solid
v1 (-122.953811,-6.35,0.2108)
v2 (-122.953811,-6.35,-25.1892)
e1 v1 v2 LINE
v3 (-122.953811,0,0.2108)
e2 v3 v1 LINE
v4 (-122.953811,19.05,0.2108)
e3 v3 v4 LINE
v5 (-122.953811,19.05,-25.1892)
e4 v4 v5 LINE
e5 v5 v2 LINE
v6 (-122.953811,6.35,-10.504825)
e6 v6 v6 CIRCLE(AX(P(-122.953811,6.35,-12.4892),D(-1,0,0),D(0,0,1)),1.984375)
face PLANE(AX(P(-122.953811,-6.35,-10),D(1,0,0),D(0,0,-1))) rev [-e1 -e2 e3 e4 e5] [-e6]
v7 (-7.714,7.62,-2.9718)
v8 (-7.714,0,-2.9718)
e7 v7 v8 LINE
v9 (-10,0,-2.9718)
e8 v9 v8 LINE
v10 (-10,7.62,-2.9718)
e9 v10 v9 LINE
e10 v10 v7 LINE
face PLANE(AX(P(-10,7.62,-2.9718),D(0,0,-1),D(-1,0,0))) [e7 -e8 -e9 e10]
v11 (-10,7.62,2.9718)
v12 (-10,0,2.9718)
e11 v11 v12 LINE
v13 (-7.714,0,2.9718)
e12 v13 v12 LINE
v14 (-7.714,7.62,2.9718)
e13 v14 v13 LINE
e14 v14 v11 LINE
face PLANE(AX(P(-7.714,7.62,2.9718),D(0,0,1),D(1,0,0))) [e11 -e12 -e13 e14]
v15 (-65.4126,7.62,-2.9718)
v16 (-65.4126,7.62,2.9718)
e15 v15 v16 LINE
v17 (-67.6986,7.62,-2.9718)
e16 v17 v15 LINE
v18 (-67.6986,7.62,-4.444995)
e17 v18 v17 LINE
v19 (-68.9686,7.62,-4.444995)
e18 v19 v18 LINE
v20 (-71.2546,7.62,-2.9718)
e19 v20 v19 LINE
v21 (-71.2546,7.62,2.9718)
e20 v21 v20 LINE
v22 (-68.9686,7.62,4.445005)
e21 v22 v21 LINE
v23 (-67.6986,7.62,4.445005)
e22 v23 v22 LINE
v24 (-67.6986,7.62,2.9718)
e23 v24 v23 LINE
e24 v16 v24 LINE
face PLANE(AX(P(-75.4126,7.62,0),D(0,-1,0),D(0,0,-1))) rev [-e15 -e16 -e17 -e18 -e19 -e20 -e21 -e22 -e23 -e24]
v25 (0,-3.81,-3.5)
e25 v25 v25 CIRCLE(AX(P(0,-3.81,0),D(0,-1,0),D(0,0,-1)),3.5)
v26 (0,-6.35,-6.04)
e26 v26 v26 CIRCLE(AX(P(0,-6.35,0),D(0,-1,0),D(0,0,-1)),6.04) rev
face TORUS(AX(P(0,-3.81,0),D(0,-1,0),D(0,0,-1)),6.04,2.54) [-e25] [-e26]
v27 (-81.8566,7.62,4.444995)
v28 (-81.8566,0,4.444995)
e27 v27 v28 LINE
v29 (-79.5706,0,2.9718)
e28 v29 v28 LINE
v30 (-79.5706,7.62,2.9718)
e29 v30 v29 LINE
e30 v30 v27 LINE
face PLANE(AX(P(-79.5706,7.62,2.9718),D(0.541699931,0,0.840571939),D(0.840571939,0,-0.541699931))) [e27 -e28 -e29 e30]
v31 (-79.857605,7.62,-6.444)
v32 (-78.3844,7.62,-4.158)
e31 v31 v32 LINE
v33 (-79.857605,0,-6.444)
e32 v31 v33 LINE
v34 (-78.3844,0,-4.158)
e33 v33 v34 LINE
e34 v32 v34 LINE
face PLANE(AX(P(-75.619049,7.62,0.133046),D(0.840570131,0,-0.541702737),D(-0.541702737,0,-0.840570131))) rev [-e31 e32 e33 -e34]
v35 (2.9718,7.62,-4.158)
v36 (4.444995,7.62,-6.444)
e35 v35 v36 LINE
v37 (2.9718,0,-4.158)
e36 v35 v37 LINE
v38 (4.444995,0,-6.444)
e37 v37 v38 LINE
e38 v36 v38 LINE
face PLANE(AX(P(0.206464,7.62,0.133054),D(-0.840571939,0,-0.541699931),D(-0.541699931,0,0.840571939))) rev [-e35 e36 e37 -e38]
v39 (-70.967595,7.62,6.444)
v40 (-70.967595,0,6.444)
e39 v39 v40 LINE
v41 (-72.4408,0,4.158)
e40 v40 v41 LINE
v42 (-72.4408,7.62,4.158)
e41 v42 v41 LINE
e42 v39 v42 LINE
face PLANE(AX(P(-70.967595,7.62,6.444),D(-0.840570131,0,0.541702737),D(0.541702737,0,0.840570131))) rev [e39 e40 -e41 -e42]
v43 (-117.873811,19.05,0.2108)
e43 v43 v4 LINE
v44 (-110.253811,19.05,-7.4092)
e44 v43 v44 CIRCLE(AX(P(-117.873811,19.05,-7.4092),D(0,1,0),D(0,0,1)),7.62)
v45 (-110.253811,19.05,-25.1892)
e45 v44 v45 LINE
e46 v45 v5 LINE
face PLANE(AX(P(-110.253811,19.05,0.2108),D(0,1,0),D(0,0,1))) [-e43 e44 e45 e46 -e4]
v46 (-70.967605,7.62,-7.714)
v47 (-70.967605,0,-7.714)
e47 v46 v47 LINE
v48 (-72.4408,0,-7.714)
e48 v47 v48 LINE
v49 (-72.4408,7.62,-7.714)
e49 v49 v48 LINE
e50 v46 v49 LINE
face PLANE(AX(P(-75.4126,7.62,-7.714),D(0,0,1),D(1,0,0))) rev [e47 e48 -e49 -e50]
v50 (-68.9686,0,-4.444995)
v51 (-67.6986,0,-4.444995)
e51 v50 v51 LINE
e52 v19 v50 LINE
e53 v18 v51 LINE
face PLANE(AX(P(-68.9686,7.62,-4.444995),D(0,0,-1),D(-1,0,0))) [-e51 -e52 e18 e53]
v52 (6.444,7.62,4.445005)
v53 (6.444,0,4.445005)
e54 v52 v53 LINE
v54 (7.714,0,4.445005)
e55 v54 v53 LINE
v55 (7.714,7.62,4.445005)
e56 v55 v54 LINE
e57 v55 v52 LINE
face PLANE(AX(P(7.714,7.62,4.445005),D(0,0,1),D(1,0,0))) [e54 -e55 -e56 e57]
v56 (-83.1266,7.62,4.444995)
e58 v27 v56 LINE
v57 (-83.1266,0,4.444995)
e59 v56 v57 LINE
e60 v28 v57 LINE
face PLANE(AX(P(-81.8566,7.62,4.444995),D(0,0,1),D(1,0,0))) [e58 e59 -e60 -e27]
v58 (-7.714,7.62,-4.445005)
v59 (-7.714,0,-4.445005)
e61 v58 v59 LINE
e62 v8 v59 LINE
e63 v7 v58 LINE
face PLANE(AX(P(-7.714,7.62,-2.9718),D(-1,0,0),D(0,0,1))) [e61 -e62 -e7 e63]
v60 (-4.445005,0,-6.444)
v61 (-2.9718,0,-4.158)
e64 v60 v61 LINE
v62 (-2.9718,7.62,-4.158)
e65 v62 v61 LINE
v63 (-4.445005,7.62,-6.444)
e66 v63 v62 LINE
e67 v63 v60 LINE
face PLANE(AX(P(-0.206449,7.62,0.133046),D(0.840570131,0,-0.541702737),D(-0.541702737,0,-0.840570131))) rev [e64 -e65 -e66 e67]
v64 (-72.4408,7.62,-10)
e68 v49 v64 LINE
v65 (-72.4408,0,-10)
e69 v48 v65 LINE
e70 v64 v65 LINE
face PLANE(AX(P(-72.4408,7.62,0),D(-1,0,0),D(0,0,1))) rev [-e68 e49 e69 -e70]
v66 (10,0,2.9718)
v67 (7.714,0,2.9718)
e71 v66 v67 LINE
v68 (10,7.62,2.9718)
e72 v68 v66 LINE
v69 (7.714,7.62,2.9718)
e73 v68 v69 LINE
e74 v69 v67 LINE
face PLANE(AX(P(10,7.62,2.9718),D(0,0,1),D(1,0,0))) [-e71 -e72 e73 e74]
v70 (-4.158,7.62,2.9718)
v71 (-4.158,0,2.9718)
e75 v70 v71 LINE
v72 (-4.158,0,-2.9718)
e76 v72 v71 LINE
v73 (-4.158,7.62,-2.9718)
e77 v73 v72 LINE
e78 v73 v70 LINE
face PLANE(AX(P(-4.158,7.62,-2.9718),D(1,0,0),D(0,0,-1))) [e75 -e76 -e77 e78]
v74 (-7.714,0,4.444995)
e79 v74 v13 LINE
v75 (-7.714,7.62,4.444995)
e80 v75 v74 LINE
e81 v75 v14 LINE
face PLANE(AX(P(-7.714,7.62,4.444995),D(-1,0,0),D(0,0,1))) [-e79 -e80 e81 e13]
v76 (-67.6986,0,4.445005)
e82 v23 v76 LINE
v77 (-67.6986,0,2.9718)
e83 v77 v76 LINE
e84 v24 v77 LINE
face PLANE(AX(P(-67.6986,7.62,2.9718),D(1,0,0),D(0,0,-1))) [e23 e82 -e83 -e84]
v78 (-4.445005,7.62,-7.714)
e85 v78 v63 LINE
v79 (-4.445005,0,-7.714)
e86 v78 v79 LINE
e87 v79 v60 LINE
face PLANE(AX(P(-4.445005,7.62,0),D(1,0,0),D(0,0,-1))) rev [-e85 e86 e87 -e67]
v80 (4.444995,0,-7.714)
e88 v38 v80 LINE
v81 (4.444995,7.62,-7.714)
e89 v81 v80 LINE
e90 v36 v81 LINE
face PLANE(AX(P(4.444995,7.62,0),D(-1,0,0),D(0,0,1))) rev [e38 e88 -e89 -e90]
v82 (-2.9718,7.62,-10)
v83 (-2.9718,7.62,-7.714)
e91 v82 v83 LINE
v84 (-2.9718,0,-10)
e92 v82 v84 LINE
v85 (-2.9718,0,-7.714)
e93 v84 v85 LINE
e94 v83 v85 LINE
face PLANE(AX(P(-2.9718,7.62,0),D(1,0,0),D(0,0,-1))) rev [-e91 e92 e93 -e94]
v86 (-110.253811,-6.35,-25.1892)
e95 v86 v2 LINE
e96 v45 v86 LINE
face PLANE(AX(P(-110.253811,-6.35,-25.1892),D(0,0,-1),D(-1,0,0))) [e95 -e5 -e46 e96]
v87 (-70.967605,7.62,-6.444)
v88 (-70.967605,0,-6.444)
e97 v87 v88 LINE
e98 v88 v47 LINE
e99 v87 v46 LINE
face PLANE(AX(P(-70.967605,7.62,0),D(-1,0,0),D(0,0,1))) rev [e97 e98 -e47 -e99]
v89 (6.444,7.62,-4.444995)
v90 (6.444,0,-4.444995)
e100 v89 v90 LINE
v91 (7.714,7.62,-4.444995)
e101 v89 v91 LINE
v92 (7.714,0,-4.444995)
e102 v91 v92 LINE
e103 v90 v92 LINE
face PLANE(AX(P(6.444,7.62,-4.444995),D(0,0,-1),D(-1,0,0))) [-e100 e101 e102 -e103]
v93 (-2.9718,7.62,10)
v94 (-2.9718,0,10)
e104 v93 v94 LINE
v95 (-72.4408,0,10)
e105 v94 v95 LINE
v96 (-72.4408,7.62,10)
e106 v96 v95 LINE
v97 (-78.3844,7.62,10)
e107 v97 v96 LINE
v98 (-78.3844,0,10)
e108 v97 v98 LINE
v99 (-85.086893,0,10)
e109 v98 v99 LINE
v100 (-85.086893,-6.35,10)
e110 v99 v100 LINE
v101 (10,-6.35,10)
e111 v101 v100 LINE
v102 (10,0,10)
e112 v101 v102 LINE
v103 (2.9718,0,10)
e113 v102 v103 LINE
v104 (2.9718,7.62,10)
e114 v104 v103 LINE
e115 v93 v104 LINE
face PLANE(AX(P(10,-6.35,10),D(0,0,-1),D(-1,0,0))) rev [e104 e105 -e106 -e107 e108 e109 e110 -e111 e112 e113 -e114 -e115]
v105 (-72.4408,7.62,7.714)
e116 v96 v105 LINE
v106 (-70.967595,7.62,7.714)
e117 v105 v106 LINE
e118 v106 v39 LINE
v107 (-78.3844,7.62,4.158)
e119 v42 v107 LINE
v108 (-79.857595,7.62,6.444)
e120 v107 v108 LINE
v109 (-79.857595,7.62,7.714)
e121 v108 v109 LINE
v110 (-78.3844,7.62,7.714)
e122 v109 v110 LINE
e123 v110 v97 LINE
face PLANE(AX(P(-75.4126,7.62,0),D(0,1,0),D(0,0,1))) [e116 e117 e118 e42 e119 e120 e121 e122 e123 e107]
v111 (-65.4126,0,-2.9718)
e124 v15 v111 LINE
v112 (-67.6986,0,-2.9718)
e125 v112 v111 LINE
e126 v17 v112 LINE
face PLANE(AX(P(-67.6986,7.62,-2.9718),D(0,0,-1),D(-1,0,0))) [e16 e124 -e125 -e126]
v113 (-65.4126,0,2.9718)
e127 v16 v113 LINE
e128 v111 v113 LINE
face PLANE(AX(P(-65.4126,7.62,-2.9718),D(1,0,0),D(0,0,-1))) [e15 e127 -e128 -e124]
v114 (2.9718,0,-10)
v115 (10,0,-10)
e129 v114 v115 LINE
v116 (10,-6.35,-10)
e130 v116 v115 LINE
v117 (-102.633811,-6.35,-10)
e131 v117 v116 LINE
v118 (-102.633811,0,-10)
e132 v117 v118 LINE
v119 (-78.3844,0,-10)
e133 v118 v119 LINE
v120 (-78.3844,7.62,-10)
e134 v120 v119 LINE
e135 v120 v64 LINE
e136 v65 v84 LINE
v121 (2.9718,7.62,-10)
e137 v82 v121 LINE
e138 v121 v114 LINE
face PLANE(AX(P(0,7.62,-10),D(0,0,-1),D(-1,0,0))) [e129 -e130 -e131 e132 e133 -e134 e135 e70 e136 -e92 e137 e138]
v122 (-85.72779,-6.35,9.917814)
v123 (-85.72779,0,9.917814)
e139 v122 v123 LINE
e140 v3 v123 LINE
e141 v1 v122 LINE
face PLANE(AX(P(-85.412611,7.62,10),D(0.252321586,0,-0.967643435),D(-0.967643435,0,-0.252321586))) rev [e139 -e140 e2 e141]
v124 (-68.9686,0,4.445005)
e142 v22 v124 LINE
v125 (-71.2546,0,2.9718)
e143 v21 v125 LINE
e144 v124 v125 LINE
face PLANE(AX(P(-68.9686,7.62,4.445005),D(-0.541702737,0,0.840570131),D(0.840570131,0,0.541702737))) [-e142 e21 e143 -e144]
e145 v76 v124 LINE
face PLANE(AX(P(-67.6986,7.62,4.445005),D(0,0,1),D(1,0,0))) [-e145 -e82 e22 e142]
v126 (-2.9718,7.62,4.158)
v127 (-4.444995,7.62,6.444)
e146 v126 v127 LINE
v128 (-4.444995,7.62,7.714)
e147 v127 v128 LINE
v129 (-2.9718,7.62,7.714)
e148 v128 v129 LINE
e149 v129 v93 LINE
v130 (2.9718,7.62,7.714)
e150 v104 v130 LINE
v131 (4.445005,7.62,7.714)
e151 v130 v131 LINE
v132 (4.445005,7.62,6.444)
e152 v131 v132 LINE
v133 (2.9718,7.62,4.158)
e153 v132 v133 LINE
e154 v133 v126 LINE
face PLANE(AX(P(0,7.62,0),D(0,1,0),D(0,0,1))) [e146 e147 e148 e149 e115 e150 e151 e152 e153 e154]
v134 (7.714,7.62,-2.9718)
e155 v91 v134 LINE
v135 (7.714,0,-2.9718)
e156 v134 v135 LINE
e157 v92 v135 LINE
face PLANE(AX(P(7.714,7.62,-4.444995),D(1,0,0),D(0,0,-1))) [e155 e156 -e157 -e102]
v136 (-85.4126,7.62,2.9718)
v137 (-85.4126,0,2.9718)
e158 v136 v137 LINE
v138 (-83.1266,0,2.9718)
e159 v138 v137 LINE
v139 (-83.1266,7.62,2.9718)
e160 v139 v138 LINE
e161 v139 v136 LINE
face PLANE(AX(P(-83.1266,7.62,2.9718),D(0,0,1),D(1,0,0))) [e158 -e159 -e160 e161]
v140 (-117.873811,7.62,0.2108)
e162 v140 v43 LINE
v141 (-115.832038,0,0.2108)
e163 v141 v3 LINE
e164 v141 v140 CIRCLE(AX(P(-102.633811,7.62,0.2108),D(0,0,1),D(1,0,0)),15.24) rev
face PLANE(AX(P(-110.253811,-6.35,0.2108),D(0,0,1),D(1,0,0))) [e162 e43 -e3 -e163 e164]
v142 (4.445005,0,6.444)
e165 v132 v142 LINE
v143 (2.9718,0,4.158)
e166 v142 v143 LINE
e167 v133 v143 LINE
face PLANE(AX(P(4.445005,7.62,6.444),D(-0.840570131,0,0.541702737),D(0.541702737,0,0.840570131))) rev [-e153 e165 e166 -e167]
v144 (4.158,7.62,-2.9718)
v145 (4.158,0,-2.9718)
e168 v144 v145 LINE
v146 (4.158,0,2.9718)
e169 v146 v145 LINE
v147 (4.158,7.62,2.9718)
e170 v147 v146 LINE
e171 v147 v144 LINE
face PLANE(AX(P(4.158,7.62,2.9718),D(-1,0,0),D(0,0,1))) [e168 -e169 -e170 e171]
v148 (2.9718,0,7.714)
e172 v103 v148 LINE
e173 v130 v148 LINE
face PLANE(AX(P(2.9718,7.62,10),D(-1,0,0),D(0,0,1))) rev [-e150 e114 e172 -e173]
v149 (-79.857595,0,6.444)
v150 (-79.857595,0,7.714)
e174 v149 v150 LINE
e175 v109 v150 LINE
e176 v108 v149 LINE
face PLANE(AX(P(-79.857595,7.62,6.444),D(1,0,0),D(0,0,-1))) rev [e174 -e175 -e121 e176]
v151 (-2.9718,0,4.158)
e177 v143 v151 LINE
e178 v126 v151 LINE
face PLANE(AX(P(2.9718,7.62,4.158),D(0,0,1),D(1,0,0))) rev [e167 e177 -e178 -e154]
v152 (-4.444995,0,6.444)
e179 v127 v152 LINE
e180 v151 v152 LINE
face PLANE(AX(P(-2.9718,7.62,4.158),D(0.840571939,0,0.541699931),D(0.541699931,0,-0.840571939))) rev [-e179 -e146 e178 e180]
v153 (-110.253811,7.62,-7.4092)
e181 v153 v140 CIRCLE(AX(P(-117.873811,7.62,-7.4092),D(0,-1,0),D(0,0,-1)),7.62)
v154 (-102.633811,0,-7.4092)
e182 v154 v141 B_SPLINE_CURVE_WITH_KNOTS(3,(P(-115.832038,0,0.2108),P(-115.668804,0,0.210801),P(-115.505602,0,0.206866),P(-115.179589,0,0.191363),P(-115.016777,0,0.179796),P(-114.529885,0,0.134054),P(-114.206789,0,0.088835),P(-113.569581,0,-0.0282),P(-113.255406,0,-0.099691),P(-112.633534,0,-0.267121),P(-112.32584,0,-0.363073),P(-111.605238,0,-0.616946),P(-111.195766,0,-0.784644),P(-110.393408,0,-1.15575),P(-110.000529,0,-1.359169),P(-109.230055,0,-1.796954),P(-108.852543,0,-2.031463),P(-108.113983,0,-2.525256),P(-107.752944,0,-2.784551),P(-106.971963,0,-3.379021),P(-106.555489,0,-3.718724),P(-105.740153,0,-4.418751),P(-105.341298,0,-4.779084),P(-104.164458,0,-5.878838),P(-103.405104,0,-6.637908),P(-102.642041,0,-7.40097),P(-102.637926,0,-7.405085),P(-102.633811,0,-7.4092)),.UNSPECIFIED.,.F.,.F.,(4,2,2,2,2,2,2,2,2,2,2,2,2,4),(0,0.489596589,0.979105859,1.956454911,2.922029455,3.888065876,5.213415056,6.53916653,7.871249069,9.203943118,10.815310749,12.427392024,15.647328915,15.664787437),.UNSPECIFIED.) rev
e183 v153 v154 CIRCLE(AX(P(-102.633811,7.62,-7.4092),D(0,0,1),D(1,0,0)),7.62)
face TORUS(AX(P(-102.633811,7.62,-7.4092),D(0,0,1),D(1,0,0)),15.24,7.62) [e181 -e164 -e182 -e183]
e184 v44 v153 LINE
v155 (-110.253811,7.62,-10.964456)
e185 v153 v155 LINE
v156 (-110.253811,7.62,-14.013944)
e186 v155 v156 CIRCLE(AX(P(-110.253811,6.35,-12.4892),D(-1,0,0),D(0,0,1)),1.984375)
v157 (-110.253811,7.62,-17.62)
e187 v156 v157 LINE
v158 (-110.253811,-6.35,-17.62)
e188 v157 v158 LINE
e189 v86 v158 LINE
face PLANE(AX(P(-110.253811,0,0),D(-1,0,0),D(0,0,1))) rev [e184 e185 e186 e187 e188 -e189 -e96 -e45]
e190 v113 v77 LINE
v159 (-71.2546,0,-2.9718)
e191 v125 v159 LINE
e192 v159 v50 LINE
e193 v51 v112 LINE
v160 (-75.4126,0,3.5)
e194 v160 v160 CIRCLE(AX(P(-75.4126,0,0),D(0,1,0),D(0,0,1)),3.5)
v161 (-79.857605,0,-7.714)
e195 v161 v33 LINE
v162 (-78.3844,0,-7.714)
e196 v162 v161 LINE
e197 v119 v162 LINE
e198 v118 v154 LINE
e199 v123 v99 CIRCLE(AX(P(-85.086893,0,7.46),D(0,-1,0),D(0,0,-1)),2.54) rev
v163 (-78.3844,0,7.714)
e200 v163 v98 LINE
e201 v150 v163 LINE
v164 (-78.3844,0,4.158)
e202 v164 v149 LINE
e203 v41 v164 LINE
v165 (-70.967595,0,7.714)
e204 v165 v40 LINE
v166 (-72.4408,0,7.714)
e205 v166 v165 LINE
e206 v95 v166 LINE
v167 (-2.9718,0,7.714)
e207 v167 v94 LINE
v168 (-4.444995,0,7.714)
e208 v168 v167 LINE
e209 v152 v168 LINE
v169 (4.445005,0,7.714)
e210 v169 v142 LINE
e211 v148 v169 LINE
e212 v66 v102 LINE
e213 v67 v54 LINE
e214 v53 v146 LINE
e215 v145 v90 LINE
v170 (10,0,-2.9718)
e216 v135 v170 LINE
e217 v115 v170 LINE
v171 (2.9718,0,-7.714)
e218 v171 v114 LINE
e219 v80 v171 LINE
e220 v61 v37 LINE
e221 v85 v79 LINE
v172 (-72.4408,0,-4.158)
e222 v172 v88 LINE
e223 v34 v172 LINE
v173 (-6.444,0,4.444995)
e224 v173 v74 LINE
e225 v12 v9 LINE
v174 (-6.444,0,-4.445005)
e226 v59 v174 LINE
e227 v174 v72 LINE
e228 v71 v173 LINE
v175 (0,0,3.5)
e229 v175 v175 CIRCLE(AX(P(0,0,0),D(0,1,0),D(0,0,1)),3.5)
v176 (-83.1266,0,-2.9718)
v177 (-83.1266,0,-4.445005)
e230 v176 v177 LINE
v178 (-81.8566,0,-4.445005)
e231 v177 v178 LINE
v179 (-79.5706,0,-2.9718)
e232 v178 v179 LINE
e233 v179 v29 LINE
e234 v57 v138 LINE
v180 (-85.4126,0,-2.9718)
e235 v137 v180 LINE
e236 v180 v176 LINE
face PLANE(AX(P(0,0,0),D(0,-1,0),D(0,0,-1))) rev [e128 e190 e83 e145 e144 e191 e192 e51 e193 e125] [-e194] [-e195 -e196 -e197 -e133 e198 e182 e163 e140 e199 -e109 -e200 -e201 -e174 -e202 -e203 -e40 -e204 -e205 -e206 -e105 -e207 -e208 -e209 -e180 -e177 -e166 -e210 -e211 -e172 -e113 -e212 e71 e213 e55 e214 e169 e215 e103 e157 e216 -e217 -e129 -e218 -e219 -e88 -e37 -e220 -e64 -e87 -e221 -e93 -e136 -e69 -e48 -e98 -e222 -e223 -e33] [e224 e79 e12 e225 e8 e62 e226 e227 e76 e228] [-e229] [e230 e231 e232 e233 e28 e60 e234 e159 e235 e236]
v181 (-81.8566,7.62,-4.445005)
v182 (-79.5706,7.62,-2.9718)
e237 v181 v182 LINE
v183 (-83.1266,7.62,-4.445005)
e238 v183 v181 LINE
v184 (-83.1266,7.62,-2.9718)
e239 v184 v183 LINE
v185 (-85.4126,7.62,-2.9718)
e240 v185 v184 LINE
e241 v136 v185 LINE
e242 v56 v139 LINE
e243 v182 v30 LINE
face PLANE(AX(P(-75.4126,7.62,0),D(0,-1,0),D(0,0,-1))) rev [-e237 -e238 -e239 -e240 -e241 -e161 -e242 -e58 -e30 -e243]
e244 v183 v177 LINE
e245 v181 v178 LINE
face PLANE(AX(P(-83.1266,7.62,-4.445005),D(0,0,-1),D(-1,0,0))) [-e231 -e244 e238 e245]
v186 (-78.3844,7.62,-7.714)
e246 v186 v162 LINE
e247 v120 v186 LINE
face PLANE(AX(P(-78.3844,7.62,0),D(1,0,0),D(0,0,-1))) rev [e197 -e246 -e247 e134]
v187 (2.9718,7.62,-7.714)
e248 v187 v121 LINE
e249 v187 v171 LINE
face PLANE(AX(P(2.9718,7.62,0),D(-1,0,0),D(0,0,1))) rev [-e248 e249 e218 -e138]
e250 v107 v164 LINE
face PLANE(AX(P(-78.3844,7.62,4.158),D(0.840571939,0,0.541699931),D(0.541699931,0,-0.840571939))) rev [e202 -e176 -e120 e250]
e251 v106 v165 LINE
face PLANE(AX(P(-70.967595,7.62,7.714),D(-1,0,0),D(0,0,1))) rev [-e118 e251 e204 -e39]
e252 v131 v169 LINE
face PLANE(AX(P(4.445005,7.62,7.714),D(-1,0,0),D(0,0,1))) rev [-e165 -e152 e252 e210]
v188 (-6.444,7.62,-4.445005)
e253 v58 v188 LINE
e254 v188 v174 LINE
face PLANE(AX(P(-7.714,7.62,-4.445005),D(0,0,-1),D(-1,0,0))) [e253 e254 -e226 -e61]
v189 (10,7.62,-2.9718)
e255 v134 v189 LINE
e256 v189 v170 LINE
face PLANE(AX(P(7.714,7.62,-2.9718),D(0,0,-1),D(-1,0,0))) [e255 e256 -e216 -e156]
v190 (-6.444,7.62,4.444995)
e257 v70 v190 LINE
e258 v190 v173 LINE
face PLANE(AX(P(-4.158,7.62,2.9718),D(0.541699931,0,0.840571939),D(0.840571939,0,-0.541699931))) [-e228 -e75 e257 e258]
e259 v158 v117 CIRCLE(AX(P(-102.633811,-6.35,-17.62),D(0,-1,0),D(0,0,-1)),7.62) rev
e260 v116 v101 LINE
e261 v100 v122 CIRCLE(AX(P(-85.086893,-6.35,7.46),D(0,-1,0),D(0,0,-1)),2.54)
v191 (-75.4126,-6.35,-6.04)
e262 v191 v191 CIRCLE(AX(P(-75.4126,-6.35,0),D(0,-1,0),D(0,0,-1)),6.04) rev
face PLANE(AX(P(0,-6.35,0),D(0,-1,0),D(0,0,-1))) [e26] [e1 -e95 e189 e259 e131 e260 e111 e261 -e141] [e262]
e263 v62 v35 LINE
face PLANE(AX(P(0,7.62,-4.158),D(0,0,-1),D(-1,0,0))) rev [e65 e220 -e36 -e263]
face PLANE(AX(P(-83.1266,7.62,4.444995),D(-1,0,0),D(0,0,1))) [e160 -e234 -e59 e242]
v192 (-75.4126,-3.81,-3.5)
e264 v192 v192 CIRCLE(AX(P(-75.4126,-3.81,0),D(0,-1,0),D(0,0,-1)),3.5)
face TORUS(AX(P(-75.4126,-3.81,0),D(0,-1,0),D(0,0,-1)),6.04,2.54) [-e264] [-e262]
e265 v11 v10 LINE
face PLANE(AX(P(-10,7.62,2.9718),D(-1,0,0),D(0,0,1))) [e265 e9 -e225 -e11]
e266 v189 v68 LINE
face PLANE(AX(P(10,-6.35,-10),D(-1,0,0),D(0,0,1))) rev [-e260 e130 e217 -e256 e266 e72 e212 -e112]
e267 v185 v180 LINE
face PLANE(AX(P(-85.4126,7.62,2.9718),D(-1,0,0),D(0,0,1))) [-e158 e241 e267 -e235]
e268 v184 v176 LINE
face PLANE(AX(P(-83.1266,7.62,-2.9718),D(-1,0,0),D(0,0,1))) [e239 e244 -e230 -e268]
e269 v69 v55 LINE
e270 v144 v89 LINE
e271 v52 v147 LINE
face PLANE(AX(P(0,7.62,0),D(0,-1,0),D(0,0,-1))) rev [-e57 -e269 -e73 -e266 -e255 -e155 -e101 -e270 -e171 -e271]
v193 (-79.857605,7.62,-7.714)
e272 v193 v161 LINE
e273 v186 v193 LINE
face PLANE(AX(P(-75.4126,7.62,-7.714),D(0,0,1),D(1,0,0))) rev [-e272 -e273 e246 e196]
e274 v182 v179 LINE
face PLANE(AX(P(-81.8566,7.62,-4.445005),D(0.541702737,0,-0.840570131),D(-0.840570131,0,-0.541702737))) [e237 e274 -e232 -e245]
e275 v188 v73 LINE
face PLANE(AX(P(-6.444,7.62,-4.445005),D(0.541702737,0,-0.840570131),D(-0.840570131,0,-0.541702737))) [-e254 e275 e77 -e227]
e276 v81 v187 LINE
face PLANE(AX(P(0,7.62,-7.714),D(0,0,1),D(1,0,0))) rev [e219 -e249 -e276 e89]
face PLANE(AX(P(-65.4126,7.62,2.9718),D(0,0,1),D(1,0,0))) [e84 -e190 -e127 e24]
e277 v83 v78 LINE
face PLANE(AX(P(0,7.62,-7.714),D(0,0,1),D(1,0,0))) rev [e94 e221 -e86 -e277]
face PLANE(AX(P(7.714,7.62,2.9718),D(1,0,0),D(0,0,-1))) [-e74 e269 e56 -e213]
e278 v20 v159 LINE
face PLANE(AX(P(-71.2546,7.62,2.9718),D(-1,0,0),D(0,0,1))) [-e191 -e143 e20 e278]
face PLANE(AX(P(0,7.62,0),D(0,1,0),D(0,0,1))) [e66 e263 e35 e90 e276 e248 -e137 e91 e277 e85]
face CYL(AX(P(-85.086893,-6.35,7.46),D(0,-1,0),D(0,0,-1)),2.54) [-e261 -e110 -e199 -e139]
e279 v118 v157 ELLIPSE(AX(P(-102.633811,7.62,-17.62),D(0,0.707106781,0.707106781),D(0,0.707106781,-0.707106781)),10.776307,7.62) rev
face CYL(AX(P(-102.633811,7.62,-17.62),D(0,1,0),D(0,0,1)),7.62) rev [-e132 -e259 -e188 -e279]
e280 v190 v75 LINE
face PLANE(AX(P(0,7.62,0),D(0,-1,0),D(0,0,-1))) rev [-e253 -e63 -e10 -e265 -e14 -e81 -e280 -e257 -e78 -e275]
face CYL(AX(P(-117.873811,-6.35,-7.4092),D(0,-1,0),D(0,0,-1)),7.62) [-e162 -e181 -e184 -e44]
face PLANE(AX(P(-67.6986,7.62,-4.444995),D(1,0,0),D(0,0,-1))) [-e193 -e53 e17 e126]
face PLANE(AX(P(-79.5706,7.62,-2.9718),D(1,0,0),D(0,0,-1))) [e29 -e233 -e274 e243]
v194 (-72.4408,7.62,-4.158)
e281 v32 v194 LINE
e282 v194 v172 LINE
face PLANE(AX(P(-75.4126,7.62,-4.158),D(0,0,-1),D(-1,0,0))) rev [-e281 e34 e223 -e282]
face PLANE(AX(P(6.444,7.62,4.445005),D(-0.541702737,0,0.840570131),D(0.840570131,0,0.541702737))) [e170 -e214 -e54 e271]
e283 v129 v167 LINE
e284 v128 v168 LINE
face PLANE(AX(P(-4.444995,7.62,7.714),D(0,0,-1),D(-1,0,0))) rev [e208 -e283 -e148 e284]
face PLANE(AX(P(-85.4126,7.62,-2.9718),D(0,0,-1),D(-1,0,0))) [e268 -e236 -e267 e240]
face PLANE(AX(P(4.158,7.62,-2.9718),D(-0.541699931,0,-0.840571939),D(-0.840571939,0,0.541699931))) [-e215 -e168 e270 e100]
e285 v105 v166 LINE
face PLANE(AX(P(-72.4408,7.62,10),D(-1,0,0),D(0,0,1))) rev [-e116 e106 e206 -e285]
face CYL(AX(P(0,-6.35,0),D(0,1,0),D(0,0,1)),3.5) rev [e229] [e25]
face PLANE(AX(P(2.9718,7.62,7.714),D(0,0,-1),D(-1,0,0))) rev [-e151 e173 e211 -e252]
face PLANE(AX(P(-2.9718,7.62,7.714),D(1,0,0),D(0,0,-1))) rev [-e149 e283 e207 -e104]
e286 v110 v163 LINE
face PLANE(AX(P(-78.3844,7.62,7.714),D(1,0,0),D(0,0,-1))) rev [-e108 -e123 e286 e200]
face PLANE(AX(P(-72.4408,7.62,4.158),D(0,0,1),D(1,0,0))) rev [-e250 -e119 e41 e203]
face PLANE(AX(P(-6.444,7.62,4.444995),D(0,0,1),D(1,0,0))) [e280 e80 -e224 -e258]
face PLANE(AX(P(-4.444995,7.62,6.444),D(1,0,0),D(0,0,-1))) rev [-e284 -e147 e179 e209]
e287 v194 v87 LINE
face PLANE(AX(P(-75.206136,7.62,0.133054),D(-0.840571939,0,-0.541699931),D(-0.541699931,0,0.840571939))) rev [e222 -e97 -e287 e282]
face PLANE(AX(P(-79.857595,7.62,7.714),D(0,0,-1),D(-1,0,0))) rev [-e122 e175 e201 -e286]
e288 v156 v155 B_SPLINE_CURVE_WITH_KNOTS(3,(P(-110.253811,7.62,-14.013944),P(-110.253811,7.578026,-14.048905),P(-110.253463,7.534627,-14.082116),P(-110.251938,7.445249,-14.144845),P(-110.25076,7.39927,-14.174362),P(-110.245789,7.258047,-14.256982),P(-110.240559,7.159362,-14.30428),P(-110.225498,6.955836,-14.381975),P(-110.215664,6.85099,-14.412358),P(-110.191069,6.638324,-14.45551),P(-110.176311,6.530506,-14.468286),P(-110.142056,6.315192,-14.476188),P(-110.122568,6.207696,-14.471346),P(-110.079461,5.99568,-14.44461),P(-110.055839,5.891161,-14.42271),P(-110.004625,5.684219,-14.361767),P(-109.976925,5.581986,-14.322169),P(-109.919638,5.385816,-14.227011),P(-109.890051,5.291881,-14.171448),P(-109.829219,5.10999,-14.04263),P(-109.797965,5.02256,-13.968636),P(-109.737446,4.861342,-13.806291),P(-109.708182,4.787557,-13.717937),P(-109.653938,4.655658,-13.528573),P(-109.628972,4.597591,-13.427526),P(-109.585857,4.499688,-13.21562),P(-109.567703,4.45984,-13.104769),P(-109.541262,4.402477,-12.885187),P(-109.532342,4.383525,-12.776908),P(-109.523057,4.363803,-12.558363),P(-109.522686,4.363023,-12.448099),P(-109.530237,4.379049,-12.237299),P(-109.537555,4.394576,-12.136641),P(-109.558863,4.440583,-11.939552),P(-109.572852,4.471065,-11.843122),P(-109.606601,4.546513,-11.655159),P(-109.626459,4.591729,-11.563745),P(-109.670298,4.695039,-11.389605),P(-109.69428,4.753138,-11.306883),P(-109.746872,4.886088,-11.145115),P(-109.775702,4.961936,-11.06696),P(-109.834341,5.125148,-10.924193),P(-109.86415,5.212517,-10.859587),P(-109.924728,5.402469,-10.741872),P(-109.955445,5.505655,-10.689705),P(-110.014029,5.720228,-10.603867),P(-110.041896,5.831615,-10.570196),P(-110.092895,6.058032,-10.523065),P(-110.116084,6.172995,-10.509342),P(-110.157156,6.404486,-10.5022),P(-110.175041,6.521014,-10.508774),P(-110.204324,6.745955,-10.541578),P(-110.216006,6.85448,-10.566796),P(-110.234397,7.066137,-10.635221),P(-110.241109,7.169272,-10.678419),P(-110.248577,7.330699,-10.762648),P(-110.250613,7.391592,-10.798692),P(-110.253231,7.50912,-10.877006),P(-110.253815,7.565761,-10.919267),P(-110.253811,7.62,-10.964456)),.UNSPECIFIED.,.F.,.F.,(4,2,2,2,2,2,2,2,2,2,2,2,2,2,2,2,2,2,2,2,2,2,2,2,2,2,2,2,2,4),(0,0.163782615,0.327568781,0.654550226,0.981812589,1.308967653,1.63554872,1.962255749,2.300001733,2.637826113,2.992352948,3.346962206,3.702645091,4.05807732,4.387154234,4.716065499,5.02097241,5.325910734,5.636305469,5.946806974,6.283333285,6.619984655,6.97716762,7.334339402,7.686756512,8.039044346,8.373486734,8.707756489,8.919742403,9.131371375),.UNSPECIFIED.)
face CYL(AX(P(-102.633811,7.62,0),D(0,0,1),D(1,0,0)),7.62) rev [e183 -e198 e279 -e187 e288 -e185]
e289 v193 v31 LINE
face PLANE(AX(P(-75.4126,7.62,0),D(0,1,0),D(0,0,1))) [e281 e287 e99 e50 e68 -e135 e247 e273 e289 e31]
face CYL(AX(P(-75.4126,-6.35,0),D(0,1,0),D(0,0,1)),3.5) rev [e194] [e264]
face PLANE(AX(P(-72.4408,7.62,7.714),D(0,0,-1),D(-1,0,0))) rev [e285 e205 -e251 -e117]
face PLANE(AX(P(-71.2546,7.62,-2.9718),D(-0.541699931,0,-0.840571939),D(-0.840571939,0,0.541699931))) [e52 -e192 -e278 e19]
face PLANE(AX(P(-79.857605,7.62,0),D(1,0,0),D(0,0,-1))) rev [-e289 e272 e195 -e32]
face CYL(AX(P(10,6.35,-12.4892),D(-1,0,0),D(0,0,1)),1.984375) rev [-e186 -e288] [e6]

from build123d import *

# Parameters (mm, degrees)
BOSS_EXTRUDE1_DEPTH   = 7.62
BOSS_EXTRUDE1_2_DEPTH = 7.62
BOSS_EXTRUDE1_3_DEPTH = 7.62
BOSS_EXTRUDE1_4_DEPTH = 7.62
SKETCH2_W             = 132.9538108
SKETCH2_H             = 20
BOSS_EXTRUDE2_DEPTH   = 6.35
LPATTERN2_COUNT       = 2
LPATTERN2_PITCH       = 75.4126
CUT_EXTRUDE1_DEPTH    = 125.148300392
FILLET1_R             = 2.54
SKETCH6_W             = 25.4
SKETCH6_H             = 25.4
BOSS_EXTRUDE7_DEPTH   = 12.7
FILLET3_R             = 7.62
FILLET5_R             = 7.62
SKETCH11_R            = 1.984375
CUT_EXTRUDE3_DEPTH    = 137.653262418
SKETCH13_R            = 3.5
CUT_EXTRUDE5_DEPTH    = 127.945019246
FILLET6_R             = 2.54


with BuildPart() as part:
    # Sketch1 → Boss-Extrude1 (new body)
    with BuildSketch(Plane(origin=(0, 0, 0), x_dir=(1, 0, 0), z_dir=(0, 1, 0))):
        Polygon((-2.9718, 10), (-2.9718, 7.714), (-4.4450054, 7.714), (-4.4450054, 6.444), (-2.9718, 4.158), (2.9718, 4.158), (4.4449946, 6.444), (4.4449946, 7.714), (2.9718, 7.714), (2.9718, 10), align=None)
    boss_extrude1 = extrude(amount=BOSS_EXTRUDE1_DEPTH)



with BuildPart() as body_2:
    # Sketch1 → Boss-Extrude1 2 (new body)
    with BuildSketch(Plane(origin=(0, 0, 0), x_dir=(1, 0, 0), z_dir=(0, 1, 0))):
        Polygon((4.158, -2.9718), (4.158, 2.9718), (6.444, 4.4449946), (7.714, 4.4449946), (7.714, 2.9718), (10, 2.9718), (10, -2.9718), (7.714, -2.9718), (7.714, -4.4450054), (6.444, -4.4450054), align=None)
    boss_extrude1_2 = extrude(amount=BOSS_EXTRUDE1_2_DEPTH)


with BuildPart() as body_3:
    # Sketch1 → Boss-Extrude1 3 (new body)
    with BuildSketch(Plane(origin=(0, 0, 0), x_dir=(1, 0, 0), z_dir=(0, 1, 0))):
        Polygon((4.4450054, -6.444), (2.9718, -4.158), (-2.9718, -4.158), (-4.4449946, -6.444), (-4.4449946, -7.714), (-2.9718, -7.714), (-2.9718, -10), (2.9718, -10), (2.9718, -7.714), (4.4450054, -7.714), align=None)
    boss_extrude1_3 = extrude(amount=BOSS_EXTRUDE1_3_DEPTH)


with BuildPart() as body_4:
    # Sketch1 → Boss-Extrude1 4 (new body)
    with BuildSketch(Plane(origin=(0, 0, 0), x_dir=(1, 0, 0), z_dir=(0, 1, 0))):
        Polygon((-10, -2.9718), (-10, 2.9718), (-7.714, 2.9718), (-7.714, 4.4450054), (-6.444, 4.4450054), (-4.158, 2.9718), (-4.158, -2.9718), (-6.444, -4.4449946), (-7.714, -4.4449946), (-7.714, -2.9718), align=None)
    boss_extrude1_4 = extrude(amount=BOSS_EXTRUDE1_4_DEPTH)


with BuildPart() as part_1:
    add(part.part)

    add(body_2.part)  # Boss-Extrude2 merges body 2

    add(body_3.part)  # Boss-Extrude2 merges body 3

    add(body_4.part)  # Boss-Extrude2 merges body 4
    # Sketch2 → Boss-Extrude2 (add)
    with BuildSketch(Plane.XZ):
        with Locations((-56.4769054, 0)):
            Rectangle(SKETCH2_W, SKETCH2_H)
    extrude(amount=BOSS_EXTRUDE2_DEPTH)

    # LPattern2: Boss-Extrude1, Boss-Extrude1 2, Boss-Extrude1 3, Boss-Extrude1 4 ×2
    with Locations(*[(-i * LPATTERN2_PITCH, 0, 0) for i in range(1, LPATTERN2_COUNT)]):
        add(boss_extrude1)
        add(boss_extrude1_2)
        add(boss_extrude1_3)
        add(boss_extrude1_4)

    # Sketch4 → Cut-Extrude1 (cut, through all)
    with BuildSketch(Plane(origin=(0, -6.35, 0), x_dir=(-1, 0, 0), z_dir=(0, -1, 0))):
        Polygon((122.9538108, -10), (85.4126108, -10), (122.9538108, -0.2108), align=None)
    extrude(amount=-CUT_EXTRUDE1_DEPTH, mode=Mode.SUBTRACT)

    # Fillet1
    fillet1_edges = [part_1.edges().sort_by_distance(p)[0] for p in [
        (-85.4126108, -3.175, 10),
    ]]
    fillet(fillet1_edges, radius=FILLET1_R)

    # Sketch6 → Boss-Extrude7 (add)
    with BuildSketch(Plane.ZY.offset(122.9538108)):
        with Locations((-12.4892, 6.35)):
            Rectangle(SKETCH6_W, SKETCH6_H)
    extrude(amount=-BOSS_EXTRUDE7_DEPTH)

    # Fillet3
    fillet3_edges = [part_1.edges().sort_by_distance(p)[0] for p in [
        (-110.2538108, 0, -4.8946),
        (-110.2538108, -3.175, -10),
    ]]
    fillet(fillet3_edges, radius=FILLET3_R)

    # Fillet5
    # the kernel refuses this fillet: 7.62 mm, written as the material it takes off along each edge
    with BuildSketch(Plane(origin=(-110.2538108, 38.1, 0.2108), x_dir=(-1, 0, 0), z_dir=(0, -1, 0))) as fillet5_piece_1:
        with BuildLine():
            CenterArc((FILLET5_R, FILLET5_R), FILLET5_R, 180, 90)
            Line((0, FILLET5_R), (0, 0))
            Line((0, 0), (FILLET5_R, 0))
        make_face()
    extrude(amount=30.48, mode=Mode.SUBTRACT)
    with BuildSketch(Plane(origin=(-102.6338108, 7.62, 0.2108), x_dir=(0.5976672776328267, 0.8017442392976488, 0), z_dir=(-0.8017442392976488, 0.5976672776328267, 0))) as fillet5_piece_2_section:
        with BuildLine():
            CenterArc((7.62 + FILLET5_R, FILLET5_R), FILLET5_R, 180, 90)
            Line((7.62, FILLET5_R), (7.62, 0))
            Line((7.62, 0), (7.62 + FILLET5_R, 0))
        make_face()
    fillet5_piece_2 = revolve(axis=Axis((-102.6338108, 7.62, 0.2108), (0, 0, -1)), revolution_arc=233.296989237, mode=Mode.PRIVATE)
    fillet5_piece_2 = split(fillet5_piece_2, bisect_by=Plane(origin=(-108.348345601, 0, -2.163807766), z_dir=(0, 1, 0)), keep=Keep.TOP, mode=Mode.PRIVATE)
    add(fillet5_piece_2, mode=Mode.SUBTRACT)

    # Sketch11 → Cut-Extrude3 (cut, through all)
    with BuildSketch(Plane.ZY.offset(122.9538108)):
        with Locations((-12.4892, 6.35)):
            Circle(SKETCH11_R)
    extrude(amount=-CUT_EXTRUDE3_DEPTH, mode=Mode.SUBTRACT)

    # Sketch13 → Cut-Extrude5 (cut, through all)
    with BuildSketch(Plane(origin=(0, 0, 0), x_dir=(1, 0, 0), z_dir=(0, 1, 0))):
        with Locations(Location((0, 0, 0), (0, 0, 270))):
            Circle(SKETCH13_R)
        with Locations(Location((-75.4126, 0, 0), (0, 0, 270))):
            Circle(SKETCH13_R)
    extrude(amount=-CUT_EXTRUDE5_DEPTH, mode=Mode.SUBTRACT)

    # Fillet6
    fillet6_edges = [part_1.edges().sort_by_distance(p)[0] for p in [
        (0, -6.35, -3.5),
        (-75.4126, -6.35, -3.5),
    ]]
    fillet(fillet6_edges, radius=FILLET6_R)


solid = part_1.part
